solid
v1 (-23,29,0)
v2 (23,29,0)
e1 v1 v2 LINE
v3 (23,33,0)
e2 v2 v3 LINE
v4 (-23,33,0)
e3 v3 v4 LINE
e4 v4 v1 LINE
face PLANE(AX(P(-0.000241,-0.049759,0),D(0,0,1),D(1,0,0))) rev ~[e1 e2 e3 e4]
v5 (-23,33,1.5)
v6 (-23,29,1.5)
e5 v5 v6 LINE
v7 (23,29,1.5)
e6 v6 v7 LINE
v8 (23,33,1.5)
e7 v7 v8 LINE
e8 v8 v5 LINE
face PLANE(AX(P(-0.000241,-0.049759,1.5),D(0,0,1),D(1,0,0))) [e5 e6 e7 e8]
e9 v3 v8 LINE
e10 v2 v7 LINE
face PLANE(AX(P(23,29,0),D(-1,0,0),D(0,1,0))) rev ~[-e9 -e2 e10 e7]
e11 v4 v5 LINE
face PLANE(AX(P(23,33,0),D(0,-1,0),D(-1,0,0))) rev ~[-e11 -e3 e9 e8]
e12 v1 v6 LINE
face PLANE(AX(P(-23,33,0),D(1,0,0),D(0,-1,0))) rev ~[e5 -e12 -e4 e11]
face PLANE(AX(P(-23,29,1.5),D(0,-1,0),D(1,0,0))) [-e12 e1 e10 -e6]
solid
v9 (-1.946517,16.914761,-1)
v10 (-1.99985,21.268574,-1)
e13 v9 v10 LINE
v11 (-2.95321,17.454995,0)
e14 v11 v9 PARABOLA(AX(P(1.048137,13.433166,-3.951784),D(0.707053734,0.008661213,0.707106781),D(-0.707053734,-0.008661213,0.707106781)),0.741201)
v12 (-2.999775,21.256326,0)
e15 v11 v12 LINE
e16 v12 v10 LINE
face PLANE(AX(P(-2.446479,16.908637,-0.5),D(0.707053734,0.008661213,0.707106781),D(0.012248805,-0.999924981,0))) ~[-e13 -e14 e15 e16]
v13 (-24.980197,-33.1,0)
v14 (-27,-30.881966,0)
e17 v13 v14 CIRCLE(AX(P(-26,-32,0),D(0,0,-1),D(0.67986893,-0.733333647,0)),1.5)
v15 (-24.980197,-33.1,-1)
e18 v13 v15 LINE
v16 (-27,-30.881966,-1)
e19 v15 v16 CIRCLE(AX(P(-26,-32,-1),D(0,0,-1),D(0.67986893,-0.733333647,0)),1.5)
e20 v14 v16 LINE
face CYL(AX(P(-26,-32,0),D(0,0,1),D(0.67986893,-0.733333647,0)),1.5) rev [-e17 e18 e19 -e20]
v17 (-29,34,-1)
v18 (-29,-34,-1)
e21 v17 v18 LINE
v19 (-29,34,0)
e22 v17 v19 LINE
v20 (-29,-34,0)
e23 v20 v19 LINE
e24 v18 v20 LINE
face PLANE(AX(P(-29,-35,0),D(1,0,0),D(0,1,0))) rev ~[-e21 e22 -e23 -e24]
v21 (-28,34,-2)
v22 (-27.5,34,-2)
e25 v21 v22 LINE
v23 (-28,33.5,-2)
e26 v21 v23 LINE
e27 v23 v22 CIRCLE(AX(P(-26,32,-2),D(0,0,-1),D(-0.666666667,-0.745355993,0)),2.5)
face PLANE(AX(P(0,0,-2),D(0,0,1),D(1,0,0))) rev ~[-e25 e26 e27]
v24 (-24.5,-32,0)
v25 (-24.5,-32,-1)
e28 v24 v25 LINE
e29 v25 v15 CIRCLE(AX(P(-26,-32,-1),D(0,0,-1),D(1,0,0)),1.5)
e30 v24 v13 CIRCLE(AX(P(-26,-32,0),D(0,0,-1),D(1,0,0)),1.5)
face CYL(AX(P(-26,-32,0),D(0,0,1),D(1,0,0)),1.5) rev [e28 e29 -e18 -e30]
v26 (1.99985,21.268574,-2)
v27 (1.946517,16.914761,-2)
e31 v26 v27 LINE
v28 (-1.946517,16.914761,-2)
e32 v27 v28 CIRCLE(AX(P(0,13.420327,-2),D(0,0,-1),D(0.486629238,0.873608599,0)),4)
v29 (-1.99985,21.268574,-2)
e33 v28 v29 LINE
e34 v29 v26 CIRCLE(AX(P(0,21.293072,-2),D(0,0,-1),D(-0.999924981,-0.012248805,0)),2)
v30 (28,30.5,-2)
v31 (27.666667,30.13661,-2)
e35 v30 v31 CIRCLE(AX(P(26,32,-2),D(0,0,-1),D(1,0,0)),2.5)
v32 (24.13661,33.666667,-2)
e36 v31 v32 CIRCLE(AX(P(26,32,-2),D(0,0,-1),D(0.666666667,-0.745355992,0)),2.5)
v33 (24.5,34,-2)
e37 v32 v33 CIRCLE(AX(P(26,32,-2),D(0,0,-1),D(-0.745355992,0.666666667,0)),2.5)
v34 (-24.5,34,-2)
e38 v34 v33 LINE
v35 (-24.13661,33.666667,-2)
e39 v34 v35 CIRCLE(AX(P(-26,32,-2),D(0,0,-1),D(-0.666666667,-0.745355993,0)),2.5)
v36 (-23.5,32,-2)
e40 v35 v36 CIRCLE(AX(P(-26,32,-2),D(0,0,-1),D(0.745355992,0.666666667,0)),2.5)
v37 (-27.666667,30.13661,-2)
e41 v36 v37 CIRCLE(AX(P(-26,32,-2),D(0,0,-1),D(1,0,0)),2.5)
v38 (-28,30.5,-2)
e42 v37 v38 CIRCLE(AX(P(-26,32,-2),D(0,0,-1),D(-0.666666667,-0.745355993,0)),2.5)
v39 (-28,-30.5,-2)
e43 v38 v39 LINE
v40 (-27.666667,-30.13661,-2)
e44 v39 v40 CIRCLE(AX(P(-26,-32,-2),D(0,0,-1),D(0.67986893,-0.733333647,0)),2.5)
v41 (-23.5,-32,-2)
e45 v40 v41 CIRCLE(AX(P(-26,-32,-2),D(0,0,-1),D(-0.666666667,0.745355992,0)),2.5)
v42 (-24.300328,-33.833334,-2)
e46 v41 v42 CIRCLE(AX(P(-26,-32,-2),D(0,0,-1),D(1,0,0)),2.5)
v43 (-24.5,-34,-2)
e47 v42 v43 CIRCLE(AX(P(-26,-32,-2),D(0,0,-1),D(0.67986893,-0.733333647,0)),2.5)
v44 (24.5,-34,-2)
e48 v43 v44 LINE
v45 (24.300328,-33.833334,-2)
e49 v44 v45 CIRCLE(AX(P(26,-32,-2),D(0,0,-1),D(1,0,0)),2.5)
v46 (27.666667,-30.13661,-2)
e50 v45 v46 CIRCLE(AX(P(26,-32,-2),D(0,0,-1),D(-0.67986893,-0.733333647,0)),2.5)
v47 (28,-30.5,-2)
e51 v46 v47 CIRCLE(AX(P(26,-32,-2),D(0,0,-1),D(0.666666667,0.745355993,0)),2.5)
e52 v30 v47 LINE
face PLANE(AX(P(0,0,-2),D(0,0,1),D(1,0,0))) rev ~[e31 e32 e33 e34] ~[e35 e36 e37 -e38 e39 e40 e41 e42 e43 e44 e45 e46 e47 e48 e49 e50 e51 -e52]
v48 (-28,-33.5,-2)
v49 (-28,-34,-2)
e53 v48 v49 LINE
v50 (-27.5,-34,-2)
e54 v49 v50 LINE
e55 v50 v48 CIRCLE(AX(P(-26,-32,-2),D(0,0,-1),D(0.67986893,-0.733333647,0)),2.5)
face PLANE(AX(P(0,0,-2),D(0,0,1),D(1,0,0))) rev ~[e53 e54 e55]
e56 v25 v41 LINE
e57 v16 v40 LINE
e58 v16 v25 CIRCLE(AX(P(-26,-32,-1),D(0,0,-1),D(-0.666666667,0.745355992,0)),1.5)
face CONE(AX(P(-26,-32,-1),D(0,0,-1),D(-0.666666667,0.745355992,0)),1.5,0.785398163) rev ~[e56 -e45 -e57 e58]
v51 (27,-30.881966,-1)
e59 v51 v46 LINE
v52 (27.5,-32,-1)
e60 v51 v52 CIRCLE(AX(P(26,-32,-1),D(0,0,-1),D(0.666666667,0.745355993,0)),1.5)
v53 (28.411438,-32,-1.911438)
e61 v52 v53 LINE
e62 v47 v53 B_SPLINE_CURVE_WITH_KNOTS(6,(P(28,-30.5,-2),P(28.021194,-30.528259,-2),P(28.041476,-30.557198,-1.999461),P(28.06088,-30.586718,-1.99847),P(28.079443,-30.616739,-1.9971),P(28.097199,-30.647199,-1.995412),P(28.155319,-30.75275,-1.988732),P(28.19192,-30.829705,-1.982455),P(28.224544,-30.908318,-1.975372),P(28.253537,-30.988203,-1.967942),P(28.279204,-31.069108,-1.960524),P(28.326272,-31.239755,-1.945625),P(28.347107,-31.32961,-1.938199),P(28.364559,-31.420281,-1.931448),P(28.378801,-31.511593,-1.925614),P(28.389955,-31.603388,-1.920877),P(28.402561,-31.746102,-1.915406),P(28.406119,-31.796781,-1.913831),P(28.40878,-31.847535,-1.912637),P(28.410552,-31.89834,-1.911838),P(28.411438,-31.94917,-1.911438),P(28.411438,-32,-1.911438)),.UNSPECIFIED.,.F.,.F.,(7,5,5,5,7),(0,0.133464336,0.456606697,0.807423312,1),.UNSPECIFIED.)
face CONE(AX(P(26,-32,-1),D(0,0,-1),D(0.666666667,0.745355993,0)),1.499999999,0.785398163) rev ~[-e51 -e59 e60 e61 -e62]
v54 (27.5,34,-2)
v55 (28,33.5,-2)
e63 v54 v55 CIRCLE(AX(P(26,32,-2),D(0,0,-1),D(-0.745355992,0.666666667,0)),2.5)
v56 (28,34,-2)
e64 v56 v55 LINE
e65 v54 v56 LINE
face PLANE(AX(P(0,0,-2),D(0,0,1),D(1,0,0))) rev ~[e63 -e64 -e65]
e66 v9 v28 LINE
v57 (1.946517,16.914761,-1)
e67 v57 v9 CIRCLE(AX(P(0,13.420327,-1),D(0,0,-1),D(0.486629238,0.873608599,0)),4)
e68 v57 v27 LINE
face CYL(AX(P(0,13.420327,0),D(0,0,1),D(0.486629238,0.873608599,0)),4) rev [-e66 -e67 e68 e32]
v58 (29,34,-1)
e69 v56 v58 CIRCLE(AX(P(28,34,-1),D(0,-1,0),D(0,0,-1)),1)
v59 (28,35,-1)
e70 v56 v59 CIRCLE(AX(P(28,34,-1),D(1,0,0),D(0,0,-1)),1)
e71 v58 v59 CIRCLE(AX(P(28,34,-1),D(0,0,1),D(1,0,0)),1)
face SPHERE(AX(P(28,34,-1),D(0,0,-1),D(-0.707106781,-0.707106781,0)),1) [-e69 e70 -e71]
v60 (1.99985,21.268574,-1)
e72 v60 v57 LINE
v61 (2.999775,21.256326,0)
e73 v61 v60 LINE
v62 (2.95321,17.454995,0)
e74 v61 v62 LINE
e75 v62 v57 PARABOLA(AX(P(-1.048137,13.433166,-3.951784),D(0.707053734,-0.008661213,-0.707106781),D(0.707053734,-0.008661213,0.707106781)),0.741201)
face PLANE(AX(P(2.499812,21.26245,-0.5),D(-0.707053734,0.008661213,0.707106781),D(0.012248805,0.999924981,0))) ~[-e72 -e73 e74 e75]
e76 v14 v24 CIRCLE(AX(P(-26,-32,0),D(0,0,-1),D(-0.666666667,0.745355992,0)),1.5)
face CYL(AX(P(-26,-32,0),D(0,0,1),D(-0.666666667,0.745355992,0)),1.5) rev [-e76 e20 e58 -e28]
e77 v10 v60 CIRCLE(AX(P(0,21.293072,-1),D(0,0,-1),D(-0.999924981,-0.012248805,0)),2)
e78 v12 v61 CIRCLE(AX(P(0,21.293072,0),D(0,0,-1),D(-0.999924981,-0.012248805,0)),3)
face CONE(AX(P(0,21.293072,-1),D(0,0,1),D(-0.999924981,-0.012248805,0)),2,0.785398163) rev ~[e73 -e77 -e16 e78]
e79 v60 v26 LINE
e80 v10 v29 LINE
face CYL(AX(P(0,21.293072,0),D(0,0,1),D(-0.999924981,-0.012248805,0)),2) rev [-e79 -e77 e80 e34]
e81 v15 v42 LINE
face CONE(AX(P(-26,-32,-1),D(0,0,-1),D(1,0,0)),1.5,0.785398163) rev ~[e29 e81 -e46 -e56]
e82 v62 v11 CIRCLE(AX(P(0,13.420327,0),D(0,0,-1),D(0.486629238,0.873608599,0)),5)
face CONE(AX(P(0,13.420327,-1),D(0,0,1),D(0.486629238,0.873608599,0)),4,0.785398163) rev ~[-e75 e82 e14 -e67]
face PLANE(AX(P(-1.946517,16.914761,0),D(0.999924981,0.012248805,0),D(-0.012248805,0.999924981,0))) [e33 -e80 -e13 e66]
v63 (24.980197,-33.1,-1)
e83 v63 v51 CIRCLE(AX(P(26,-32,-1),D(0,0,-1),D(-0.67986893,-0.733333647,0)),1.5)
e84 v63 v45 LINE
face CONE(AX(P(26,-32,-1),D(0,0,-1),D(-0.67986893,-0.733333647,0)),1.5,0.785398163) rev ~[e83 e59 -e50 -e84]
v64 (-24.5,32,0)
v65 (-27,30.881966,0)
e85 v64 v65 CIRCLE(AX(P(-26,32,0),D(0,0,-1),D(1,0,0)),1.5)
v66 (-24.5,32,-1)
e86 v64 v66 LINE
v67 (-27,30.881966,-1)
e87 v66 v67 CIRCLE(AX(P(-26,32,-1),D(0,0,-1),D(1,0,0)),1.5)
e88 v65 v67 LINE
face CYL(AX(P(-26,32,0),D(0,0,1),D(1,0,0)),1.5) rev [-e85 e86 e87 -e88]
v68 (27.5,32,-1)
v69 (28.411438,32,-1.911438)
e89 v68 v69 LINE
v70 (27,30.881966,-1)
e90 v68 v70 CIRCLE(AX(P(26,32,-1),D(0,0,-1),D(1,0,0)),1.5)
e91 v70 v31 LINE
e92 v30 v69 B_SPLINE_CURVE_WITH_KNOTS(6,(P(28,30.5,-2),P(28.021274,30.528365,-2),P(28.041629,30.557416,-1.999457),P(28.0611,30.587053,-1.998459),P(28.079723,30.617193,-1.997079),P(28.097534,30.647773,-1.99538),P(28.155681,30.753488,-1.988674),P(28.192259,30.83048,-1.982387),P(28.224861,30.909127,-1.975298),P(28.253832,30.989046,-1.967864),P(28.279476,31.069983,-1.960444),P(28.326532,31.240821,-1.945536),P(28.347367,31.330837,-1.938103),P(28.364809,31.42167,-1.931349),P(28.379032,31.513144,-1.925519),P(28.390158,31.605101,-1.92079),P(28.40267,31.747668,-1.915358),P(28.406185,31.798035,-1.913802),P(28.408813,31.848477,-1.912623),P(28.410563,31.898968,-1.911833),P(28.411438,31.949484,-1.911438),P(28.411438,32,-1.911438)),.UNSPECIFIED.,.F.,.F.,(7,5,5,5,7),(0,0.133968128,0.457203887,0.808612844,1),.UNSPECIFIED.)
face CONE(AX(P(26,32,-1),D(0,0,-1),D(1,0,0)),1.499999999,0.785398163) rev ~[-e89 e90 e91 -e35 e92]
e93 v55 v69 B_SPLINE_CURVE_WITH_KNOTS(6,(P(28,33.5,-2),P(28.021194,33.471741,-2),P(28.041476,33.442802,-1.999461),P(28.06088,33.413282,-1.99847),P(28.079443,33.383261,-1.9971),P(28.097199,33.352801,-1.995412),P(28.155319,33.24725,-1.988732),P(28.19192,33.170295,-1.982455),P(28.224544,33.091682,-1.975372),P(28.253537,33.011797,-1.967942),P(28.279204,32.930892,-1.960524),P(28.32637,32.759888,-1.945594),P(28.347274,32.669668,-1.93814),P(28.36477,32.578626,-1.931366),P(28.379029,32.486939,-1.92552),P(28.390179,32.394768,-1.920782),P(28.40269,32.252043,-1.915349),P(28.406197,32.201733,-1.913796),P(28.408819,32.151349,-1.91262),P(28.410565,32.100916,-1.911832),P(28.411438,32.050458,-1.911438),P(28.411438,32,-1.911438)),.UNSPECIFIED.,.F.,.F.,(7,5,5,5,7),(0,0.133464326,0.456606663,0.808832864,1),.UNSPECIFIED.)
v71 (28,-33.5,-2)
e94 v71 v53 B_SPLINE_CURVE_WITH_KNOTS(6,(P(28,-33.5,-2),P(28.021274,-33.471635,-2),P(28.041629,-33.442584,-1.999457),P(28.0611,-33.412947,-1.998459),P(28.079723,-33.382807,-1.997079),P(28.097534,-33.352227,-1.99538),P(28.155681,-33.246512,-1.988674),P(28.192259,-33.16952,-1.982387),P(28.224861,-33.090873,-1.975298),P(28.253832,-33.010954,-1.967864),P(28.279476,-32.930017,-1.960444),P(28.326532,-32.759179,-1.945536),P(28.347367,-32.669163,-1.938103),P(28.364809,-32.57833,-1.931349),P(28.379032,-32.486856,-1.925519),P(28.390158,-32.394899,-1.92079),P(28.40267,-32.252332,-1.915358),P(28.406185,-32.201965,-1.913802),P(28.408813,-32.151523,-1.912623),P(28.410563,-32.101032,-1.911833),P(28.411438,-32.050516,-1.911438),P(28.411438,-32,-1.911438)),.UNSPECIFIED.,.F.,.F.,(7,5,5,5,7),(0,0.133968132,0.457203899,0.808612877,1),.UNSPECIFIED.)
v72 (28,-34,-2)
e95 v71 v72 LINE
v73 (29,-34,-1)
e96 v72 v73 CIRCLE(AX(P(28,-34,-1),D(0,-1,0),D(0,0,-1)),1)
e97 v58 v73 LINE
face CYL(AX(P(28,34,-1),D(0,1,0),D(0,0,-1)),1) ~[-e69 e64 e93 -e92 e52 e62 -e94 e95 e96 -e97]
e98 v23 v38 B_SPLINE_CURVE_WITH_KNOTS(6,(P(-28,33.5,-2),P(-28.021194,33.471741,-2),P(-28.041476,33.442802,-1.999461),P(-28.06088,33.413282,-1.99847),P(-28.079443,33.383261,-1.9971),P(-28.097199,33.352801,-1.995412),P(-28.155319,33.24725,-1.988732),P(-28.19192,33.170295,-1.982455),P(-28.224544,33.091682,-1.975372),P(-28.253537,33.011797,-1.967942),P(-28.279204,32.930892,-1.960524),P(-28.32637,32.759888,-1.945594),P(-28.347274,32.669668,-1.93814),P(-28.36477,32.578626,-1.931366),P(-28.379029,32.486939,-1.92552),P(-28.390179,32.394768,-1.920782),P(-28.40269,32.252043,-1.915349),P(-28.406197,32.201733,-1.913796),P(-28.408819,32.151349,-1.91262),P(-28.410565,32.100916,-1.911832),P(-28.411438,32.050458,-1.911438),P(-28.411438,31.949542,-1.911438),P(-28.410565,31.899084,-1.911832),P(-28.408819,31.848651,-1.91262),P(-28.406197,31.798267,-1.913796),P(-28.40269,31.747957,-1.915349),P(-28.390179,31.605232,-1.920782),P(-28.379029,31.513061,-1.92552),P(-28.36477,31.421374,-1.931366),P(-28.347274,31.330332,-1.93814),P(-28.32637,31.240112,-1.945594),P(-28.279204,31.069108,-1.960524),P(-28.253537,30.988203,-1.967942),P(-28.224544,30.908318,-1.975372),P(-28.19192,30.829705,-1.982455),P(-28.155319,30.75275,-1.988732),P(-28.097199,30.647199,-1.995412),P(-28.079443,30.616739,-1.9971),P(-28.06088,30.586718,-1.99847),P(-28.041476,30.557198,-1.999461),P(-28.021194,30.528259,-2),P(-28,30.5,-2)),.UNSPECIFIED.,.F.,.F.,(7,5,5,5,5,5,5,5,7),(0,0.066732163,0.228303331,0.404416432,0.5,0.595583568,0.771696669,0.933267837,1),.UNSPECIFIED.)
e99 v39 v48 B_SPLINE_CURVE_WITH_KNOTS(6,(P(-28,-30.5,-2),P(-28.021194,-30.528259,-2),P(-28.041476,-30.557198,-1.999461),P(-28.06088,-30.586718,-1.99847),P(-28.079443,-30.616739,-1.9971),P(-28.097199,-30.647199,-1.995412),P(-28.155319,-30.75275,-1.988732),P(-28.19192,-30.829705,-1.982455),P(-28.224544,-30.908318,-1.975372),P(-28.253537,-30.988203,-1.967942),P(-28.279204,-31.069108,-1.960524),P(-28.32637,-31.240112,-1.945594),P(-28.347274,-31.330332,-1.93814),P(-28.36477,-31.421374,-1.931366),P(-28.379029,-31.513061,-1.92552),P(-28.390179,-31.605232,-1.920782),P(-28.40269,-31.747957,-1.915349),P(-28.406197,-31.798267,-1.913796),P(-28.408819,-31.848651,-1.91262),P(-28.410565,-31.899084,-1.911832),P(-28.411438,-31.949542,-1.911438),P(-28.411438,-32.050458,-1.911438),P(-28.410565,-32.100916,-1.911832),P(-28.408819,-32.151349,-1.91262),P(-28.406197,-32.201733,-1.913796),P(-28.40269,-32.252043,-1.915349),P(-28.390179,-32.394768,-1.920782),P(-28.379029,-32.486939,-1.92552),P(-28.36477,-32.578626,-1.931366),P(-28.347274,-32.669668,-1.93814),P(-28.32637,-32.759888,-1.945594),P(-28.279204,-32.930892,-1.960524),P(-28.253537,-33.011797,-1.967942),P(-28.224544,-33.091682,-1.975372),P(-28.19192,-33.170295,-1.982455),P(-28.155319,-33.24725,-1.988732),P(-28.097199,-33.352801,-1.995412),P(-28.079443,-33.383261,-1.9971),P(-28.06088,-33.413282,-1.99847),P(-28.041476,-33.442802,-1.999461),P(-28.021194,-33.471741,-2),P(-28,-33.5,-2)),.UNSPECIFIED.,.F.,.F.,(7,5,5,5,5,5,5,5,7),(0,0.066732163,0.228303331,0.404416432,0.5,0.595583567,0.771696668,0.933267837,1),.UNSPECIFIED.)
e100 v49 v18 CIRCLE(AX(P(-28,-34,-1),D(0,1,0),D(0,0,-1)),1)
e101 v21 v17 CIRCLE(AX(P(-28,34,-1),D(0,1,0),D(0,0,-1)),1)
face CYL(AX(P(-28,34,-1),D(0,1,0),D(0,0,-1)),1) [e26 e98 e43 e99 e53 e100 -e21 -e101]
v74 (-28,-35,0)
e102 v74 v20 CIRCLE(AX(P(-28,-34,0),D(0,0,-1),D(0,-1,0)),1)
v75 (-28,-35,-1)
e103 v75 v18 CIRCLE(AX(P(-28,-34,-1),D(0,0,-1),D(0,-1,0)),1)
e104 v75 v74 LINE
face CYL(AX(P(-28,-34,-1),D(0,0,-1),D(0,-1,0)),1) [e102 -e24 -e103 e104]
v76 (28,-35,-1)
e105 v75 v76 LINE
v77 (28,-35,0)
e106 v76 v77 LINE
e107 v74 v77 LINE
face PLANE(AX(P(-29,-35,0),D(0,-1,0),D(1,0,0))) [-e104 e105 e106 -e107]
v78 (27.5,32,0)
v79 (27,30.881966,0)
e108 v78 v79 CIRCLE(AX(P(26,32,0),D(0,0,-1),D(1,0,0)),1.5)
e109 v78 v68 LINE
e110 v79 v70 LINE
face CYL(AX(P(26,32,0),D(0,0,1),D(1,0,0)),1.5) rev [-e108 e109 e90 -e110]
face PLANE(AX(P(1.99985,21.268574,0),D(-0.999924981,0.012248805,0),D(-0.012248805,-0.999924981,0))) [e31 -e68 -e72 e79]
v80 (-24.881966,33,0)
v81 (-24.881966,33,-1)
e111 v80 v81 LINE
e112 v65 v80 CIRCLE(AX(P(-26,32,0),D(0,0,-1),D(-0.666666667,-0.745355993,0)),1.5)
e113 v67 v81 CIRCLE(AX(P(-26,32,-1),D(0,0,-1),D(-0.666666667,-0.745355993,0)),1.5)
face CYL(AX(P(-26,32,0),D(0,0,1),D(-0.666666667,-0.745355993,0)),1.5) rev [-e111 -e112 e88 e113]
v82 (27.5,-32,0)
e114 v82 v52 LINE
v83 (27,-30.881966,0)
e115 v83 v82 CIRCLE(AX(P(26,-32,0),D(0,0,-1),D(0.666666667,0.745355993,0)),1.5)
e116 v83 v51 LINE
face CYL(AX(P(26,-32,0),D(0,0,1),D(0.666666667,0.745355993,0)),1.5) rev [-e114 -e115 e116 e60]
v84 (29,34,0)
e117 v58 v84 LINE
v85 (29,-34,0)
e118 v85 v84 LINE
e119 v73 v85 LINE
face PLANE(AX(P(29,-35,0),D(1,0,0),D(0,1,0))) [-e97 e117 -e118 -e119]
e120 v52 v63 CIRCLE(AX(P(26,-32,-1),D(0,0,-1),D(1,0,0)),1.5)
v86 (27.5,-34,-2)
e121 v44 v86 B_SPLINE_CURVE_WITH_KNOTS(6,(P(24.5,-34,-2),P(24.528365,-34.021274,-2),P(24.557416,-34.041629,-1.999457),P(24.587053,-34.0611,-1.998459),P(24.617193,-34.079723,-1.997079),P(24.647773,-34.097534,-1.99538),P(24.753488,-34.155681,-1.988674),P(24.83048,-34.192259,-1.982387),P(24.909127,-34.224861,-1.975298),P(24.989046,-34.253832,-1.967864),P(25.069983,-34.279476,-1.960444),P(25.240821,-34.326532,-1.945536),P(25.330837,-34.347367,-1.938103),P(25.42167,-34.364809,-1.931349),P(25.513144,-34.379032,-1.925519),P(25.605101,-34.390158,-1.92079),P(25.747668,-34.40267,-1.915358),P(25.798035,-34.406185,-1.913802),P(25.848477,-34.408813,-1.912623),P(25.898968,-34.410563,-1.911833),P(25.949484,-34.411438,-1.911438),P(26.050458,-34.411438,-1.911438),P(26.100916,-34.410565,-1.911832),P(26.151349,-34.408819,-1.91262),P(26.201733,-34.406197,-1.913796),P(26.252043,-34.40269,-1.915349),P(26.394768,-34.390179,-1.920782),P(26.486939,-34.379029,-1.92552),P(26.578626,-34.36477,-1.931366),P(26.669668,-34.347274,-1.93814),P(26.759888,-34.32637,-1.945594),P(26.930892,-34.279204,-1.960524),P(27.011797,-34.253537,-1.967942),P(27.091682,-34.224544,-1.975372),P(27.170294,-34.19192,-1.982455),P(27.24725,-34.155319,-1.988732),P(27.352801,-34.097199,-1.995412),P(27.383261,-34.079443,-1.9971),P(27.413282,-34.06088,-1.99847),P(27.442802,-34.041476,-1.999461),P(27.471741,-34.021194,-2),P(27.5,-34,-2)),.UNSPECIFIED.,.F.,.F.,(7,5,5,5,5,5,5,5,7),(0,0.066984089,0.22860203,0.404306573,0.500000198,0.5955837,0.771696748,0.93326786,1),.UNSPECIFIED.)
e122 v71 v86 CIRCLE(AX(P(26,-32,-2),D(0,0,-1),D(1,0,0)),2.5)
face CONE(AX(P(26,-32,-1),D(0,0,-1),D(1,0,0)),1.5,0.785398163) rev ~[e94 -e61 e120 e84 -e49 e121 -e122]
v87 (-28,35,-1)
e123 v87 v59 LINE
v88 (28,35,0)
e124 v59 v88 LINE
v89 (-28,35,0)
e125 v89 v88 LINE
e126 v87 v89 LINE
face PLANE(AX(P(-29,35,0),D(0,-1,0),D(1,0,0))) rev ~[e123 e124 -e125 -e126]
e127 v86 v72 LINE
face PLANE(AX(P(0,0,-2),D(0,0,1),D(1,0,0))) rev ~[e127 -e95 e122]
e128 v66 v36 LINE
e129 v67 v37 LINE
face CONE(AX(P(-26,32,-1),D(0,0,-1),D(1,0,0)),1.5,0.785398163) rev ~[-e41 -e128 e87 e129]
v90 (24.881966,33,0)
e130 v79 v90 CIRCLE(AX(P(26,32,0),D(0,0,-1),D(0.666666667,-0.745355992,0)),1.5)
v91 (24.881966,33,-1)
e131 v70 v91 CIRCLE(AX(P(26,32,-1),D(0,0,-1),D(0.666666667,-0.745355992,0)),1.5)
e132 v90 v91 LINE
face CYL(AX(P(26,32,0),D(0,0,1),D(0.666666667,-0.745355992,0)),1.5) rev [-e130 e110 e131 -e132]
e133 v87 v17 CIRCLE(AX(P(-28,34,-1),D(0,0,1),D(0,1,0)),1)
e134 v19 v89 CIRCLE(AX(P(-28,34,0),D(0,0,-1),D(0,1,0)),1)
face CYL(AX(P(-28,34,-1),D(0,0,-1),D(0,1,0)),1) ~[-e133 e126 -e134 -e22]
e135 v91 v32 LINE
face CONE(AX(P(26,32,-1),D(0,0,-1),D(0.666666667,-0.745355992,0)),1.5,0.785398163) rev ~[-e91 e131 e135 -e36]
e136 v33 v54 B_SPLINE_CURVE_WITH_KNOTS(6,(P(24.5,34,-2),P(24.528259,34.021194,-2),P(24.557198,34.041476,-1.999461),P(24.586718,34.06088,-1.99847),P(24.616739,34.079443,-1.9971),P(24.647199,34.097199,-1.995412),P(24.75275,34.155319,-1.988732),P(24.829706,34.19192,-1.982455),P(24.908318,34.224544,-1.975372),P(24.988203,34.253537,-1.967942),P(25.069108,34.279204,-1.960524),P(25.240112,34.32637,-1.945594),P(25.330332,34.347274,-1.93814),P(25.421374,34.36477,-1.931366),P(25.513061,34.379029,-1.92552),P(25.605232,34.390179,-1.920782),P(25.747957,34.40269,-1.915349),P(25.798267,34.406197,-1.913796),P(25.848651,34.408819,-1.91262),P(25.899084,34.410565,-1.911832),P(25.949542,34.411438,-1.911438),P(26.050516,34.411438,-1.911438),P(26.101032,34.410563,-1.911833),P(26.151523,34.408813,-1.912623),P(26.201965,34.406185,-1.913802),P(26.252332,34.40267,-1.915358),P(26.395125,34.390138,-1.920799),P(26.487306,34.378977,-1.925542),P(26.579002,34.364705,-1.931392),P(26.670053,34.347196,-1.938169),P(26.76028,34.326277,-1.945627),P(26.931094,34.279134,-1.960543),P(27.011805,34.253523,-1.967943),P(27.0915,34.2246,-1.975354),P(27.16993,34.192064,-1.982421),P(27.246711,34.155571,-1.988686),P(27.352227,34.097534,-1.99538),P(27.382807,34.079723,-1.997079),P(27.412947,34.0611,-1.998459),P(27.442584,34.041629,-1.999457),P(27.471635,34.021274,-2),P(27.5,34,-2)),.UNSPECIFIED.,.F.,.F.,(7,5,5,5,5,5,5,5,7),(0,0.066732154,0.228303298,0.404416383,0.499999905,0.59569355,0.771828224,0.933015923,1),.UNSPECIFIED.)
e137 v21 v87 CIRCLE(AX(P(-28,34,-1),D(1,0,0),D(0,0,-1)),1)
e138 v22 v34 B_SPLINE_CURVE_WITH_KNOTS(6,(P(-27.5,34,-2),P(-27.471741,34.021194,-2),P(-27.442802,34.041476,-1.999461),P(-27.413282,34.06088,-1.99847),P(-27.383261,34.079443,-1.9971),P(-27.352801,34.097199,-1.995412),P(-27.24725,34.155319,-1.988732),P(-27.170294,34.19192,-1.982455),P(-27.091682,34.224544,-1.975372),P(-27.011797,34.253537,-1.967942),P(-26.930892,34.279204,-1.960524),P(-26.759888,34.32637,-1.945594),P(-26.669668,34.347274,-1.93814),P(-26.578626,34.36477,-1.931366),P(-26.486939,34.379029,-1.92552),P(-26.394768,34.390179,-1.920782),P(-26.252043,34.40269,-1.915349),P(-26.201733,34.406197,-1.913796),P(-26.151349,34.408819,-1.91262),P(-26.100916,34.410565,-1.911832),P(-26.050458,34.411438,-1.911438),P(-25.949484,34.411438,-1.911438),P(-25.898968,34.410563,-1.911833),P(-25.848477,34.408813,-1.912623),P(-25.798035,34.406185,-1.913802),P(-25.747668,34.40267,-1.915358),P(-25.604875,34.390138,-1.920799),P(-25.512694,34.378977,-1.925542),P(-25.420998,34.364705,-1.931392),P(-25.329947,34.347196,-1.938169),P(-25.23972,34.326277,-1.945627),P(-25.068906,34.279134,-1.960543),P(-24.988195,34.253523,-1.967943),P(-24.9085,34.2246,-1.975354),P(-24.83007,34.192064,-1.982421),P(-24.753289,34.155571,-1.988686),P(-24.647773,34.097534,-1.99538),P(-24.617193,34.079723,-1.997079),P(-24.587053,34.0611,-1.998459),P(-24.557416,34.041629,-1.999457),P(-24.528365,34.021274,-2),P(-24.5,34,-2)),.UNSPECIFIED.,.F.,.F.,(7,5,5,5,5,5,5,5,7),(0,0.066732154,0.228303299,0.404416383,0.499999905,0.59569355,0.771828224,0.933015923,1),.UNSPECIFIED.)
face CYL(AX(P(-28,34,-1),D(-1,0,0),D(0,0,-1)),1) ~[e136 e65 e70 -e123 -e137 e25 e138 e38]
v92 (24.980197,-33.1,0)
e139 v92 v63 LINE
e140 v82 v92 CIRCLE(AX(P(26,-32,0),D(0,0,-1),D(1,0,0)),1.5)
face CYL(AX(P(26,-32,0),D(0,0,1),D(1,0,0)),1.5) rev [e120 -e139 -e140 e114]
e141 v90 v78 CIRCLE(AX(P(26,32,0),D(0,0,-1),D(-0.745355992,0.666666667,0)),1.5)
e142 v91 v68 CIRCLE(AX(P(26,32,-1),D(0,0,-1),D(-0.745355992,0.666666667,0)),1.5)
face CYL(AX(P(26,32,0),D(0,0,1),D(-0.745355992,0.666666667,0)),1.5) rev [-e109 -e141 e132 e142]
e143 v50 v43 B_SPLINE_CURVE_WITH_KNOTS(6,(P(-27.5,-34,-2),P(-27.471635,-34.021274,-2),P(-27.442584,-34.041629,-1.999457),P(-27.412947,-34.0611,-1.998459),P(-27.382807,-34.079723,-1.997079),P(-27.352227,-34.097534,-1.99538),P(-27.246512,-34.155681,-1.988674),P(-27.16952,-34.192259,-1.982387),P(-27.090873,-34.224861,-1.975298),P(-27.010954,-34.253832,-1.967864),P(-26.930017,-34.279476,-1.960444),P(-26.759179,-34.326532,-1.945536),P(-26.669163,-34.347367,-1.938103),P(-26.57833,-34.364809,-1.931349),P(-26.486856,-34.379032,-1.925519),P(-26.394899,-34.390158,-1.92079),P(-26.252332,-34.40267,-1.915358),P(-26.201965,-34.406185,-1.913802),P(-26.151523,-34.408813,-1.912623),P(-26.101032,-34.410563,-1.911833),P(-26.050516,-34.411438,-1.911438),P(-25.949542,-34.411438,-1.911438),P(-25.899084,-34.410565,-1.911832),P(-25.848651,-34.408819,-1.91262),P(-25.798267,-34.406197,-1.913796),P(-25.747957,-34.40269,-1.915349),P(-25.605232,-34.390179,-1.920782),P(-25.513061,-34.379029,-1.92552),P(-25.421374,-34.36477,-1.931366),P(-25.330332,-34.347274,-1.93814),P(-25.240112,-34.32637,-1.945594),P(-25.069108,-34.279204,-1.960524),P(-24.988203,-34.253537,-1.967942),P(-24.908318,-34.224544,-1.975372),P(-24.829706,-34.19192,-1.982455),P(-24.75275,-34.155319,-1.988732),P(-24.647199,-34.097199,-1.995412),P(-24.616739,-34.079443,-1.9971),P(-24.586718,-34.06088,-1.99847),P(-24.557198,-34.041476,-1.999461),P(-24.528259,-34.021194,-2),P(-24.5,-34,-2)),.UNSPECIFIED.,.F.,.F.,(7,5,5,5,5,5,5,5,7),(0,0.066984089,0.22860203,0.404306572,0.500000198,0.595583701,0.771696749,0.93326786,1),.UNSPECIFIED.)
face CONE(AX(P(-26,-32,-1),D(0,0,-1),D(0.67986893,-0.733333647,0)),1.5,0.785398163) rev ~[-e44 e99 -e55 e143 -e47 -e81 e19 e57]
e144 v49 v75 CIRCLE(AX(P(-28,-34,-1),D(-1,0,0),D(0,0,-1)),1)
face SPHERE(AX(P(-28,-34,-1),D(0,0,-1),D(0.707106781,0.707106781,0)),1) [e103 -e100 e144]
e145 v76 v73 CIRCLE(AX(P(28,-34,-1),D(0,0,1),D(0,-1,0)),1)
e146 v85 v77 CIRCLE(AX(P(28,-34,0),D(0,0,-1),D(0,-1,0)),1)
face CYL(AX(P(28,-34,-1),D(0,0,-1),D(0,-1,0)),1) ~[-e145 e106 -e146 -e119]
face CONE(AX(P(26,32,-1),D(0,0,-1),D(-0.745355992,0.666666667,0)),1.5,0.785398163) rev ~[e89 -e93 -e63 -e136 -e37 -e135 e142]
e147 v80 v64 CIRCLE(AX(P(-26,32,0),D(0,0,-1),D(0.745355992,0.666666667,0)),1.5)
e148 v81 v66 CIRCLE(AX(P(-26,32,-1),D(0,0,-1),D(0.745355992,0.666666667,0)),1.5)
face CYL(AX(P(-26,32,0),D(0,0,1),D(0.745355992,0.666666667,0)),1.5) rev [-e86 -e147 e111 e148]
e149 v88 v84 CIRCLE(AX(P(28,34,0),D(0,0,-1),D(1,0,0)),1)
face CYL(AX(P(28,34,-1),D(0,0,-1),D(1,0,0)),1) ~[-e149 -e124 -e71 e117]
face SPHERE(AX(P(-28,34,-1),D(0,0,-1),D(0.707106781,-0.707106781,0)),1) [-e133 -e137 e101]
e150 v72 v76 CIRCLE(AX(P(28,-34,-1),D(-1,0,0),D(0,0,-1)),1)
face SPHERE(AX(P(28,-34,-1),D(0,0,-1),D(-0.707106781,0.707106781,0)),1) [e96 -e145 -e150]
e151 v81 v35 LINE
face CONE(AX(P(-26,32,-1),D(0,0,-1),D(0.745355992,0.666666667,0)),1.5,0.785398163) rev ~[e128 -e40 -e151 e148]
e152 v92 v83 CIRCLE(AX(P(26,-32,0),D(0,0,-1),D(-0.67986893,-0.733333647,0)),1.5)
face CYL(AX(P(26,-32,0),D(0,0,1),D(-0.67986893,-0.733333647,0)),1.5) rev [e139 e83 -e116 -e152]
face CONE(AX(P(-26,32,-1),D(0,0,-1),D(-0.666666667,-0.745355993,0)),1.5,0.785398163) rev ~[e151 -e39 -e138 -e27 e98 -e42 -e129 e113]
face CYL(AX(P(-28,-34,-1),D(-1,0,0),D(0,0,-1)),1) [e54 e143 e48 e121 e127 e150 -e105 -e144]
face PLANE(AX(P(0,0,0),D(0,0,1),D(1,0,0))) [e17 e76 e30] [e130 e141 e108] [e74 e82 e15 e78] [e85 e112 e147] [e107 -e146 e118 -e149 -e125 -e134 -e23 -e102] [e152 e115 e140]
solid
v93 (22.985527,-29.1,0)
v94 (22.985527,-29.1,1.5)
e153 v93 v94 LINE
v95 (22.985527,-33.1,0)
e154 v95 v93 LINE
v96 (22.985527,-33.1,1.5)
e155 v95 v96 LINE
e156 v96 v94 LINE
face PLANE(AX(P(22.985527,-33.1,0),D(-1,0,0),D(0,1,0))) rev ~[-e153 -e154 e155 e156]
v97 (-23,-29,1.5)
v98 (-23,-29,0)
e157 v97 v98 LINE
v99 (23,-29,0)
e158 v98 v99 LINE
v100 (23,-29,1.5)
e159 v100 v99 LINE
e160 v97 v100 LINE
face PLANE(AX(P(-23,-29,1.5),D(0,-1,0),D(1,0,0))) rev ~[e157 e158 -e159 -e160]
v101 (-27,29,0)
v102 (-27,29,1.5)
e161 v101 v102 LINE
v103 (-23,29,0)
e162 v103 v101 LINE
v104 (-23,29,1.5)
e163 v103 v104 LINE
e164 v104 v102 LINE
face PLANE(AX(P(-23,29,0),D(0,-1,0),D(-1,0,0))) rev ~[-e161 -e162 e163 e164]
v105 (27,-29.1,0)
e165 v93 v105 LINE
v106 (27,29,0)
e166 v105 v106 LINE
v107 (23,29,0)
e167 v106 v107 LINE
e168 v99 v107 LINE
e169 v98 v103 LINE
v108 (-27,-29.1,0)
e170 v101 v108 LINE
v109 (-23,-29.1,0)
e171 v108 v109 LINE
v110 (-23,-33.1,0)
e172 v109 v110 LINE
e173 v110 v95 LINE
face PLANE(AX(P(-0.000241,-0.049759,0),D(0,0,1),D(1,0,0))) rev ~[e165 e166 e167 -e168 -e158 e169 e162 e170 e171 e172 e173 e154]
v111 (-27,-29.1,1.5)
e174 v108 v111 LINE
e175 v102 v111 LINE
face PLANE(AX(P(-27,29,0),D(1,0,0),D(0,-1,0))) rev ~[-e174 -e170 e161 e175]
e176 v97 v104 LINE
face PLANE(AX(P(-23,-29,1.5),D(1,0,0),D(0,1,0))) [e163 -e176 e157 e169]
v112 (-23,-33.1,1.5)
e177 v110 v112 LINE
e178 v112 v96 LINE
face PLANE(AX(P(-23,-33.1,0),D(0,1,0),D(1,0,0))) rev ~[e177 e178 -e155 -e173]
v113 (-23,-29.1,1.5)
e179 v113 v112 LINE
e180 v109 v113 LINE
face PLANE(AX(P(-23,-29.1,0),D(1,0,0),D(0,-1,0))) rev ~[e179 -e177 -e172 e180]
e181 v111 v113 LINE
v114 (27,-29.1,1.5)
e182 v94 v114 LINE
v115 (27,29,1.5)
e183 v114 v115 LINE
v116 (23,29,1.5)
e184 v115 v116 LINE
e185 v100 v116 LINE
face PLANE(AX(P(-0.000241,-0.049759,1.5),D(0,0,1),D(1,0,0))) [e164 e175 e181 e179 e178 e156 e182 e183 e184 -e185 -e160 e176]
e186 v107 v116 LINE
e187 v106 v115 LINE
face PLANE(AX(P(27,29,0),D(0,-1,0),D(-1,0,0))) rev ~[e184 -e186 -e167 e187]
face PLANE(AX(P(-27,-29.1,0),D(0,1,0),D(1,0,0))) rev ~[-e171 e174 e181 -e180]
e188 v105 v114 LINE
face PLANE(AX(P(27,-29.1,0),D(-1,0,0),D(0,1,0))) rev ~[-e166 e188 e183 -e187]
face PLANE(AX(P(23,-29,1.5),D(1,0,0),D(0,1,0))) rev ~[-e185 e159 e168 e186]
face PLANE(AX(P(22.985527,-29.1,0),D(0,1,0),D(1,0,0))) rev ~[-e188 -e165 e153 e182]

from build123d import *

# Parameters (mm, degrees)
F0_W         = 58
F0_H         = 70
F1_DEPTH     = 2
F2_DEPTH     = 1.5
F3_SIZE      = 1
F4_T1_DEPTH  = 56
F4_T3_DEPTH  = 68
F4_T5_DEPTH  = 3.5
F4_S9_W      = 1
F4_S9_H      = 1
F4_T10_DEPTH = 1
F4_S15_W     = 1
F4_S15_H     = 1
F4_T16_DEPTH = 1
F4_S21_W     = 1
F4_S21_H     = 1
F4_T22_DEPTH = 1
F4_S27_W     = 1
F4_S27_H     = 1
F4_T28_DEPTH = 1
F5_W         = 46
F5_H         = 58
F6_DEPTH     = 1.5
F7_SIZE      = 1


# Not quite as in the source:
# - a fillet or chamfer that OpenCascade refuses, or shapes differently, is made with other operations: its cross-section is extruded or revolved along the edge and cut away or added


with BuildPart() as f1:
    # F0 (on Top) → F1 (new body)
    with BuildSketch(Plane.XY):
        Rectangle(F0_W, F0_H)
        with BuildLine():
            Line((24.9801966052, -33.1000004709), (22.9855267704, -33.1000004709))
            Line((22.9855267704, -33.1000004709), (-23, -33.1000004709))
            Line((-23, -33.1000004709), (-24.9801966052, -33.1000004709))
            ThreePointArc((-24.9801966052, -33.1000004709), (-27.1090614319, -33.009941949), (-27, -30.8819660113))
            Line((-27, -30.8819660113), (-27, -29.1000004709))
            Line((-27, -29.1000004709), (-27, 29))
            Line((-27, 29), (-27, 30.8819660113))
            ThreePointArc((-27, 30.8819660113), (-27.0606601718, 33.0606601718), (-24.8819660113, 33))
            Line((-24.8819660113, 33), (-23, 33))
            Line((-23, 33), (23, 33))
            Line((23, 33), (24.8819660113, 33))
            ThreePointArc((24.8819660113, 33), (26.5352331347, 33.4012585384), (27.5, 32))
            ThreePointArc((27.5, 32), (27.3693063938, 31.3876275643), (27, 30.8819660113))
            Line((27, 30.8819660113), (27, 29))
            Line((27, 29), (27, -29.1000004709))
            Line((27, -29.1000004709), (27, -30.8819660113))
            ThreePointArc((27, -30.8819660113), (27.3693063938, -31.3876275643), (27.5, -32))
            ThreePointArc((27.5, -32), (26.6001228657, -33.374719079), (24.9801966052, -33.1000004709))
        make_face(mode=Mode.SUBTRACT)
        with BuildLine():
            Line((-24.9801966052, -33.1000004709), (-23, -33.1000004709))
            Line((-23, -33.1000004709), (-23, -29.1000004709))
            Line((-23, -29.1000004709), (-27, -29.1000004709))
            Line((-27, -29.1000004709), (-27, -30.8819660113))
            ThreePointArc((-27, -30.8819660113), (-25.3876275643, -30.6306936062), (-24.5, -32))
            ThreePointArc((-24.5, -32), (-24.625280921, -32.6001228657), (-24.9801966052, -33.1000004709))
        make_face()
        Polygon((-23, -33.1000004709), (22.9855267704, -33.1000004709), (22.9855267704, -29.1000004709), (27, -29.1000004709), (27, 29), (23, 29), (23, 33), (-23, 33), (-23, 29), (-27, 29), (-27, -29.1000004709), (-23, -29.1000004709), align=None)
        with BuildLine():
            ThreePointArc((1.9465169508, 16.914761033), (0, 9.4203266352), (-1.9465169508, 16.914761033))
            Line((-1.9465169508, 16.914761033), (-1.9998499612, 21.2685744208))
            ThreePointArc((-1.9998499612, 21.2685744208), (0, 23.2930720299), (1.9998499612, 21.2685744208))
            Line((1.9998499612, 21.2685744208), (1.9465169508, 16.914761033))
        make_face(mode=Mode.SUBTRACT)
        with BuildLine():
            Line((22.9855267704, -29.1000004709), (22.9855267704, -33.1000004709))
            Line((22.9855267704, -33.1000004709), (24.9801966052, -33.1000004709))
            ThreePointArc((24.9801966052, -33.1000004709), (24.8909385681, -30.990058051), (27, -30.8819660113))
            Line((27, -30.8819660113), (27, -29.1000004709))
            Line((27, -29.1000004709), (22.9855267704, -29.1000004709))
        make_face()
        with BuildLine():
            Line((-27, 30.8819660113), (-27, 29))
            Line((-27, 29), (-23, 29))
            Line((-23, 29), (-23, 33))
            Line((-23, 33), (-24.8819660113, 33))
            ThreePointArc((-24.8819660113, 33), (-24.5987414616, 32.5352331347), (-24.5, 32))
            ThreePointArc((-24.5, 32), (-25.3876275643, 30.6306936062), (-27, 30.8819660113))
        make_face()
        with BuildLine():
            Line((23, 29), (27, 29))
            Line((27, 29), (27, 30.8819660113))
            ThreePointArc((27, 30.8819660113), (24.9393398282, 30.9393398282), (24.8819660113, 33))
            Line((24.8819660113, 33), (23, 33))
            Line((23, 33), (23, 29))
        make_face()
    extrude(amount=-F1_DEPTH)

    # F3
    f3_edges = [f1.edges().sort_by_distance(p)[0] for p in [
        (25, 33.118034, -2),
        (-27.118034, 31, -2),
        (27.019803, -30.9, -2),
        (-25, -33.118034, -2),
    ]]
    chamfer(f3_edges, length=F3_SIZE)

    # F4: fillet of radius 1 on 8 edges, made by hand

    # F4_s2 → F4_t1 (cut)
    with BuildSketch(Plane.YZ.offset(-28)):
        with BuildLine():
            ThreePointArc((-34, -2), (-34.7071067812, -1.7071067812), (-35, -1))
            Line((-35, -1), (-35, -2))
            Line((-35, -2), (-34, -2))
        make_face()
        with BuildLine():
            ThreePointArc((34, -2), (34.7071067812, -1.7071067812), (35, -1))
            Line((35, -1), (35, -2))
            Line((35, -2), (34, -2))
        make_face()
    extrude(amount=F4_T1_DEPTH, mode=Mode.SUBTRACT)

    # F4_s4 → F4_t3 (cut)
    with BuildSketch(Plane.XZ.offset(-34)):
        with BuildLine():
            ThreePointArc((-28, -2), (-28.7071067812, -1.7071067812), (-29, -1))
            Line((-29, -1), (-29, -2))
            Line((-29, -2), (-28, -2))
        make_face()
        with BuildLine():
            ThreePointArc((28, -2), (28.7071067812, -1.7071067812), (29, -1))
            Line((29, -1), (29, -2))
            Line((29, -2), (28, -2))
        make_face()
    extrude(amount=F4_T3_DEPTH, mode=Mode.SUBTRACT)

    # F4_s6 → F4_t5 (cut)
    with BuildSketch(Plane.XY.offset(-1)):
        with BuildLine():
            ThreePointArc((-28, 35), (-28.7071067812, 34.7071067812), (-29, 34))
            Line((-29, 34), (-29, 35))
            Line((-29, 35), (-28, 35))
        make_face()
        with BuildLine():
            ThreePointArc((29, 34), (28.7071067812, 34.7071067812), (28, 35))
            Line((28, 35), (29, 35))
            Line((29, 35), (29, 34))
        make_face()
        with BuildLine():
            ThreePointArc((28, -35), (28.7071067812, -34.7071067812), (29, -34))
            Line((29, -34), (29, -35))
            Line((29, -35), (28, -35))
        make_face()
        with BuildLine():
            ThreePointArc((-28, -35), (-28.7071067812, -34.7071067812), (-29, -34))
            Line((-29, -34), (-29, -35))
            Line((-29, -35), (-28, -35))
        make_face()
    extrude(amount=F4_T5_DEPTH, mode=Mode.SUBTRACT)


with BuildPart() as f2:
    # F0 (on Top) → F2 (new body)
    with BuildSketch(Plane.XY):
        Polygon((-23, -33.1000004709), (22.9855267704, -33.1000004709), (22.9855267704, -29.1000004709), (27, -29.1000004709), (27, 29), (23, 29), (23, 33), (-23, 33), (-23, 29), (-27, 29), (-27, -29.1000004709), (-23, -29.1000004709), align=None)
        with BuildLine():
            ThreePointArc((1.9465169508, 16.914761033), (0, 9.4203266352), (-1.9465169508, 16.914761033))
            Line((-1.9465169508, 16.914761033), (-1.9998499612, 21.2685744208))
            ThreePointArc((-1.9998499612, 21.2685744208), (0, 23.2930720299), (1.9998499612, 21.2685744208))
            Line((1.9998499612, 21.2685744208), (1.9465169508, 16.914761033))
        make_face(mode=Mode.SUBTRACT)
    extrude(amount=F2_DEPTH)

    # F5 (on face) → F6 (cut)
    with BuildSketch(Plane.XY.offset(1.5)):
        Rectangle(F5_W, F5_H)
        with BuildLine():
            Line((1.9998499612, 21.2685744208), (1.9465169508, 16.914761033))
            ThreePointArc((1.9465169508, 16.914761033), (0, 9.4203266352), (-1.9465169508, 16.914761033))
            Line((-1.9465169508, 16.914761033), (-1.9998499612, 21.2685744208))
            ThreePointArc((-1.9998499612, 21.2685744208), (0, 23.2930720299), (1.9998499612, 21.2685744208))
        make_face(mode=Mode.SUBTRACT)
    extrude(amount=-F6_DEPTH, mode=Mode.SUBTRACT)


with BuildPart() as f4_tool8:
    # F4_s9 → F4_t10 (new body)
    with BuildSketch(Plane.XY.offset(-1)):
        with Locations((-28.5, -34.5)):
            Rectangle(F4_S9_W, F4_S9_H)
    extrude(amount=-F4_T10_DEPTH)

    # F4_s11 → F4_t12 (revolve, cut)
    with BuildSketch(Plane(origin=(-28, -34, -1), x_dir=(0.7071067812, 0.7071067812, 0), z_dir=(-0.7071067812, 0.7071067812, 0))):
        with BuildLine():
            ThreePointArc((0, -1), (1, 0), (0, 1))
            Line((0, 1), (0, -1))
        make_face()
    revolve(axis=Axis((-28, -34, -1), (0, 0, -1)), mode=Mode.SUBTRACT)


with BuildPart() as f1_1:
    add(f1.part)

    # F4_t7: cut F4_tool8
    add(f4_tool8.part, mode=Mode.SUBTRACT)


with BuildPart() as f4_tool14:
    # F4_s15 → F4_t16 (new body)
    with BuildSketch(Plane.XY.offset(-1)):
        with Locations((28.5, -34.5)):
            Rectangle(F4_S15_W, F4_S15_H)
    extrude(amount=-F4_T16_DEPTH)

    # F4_s17 → F4_t18 (revolve, cut)
    with BuildSketch(Plane(origin=(28, -34, -1), x_dir=(-0.7071067812, 0.7071067812, 0), z_dir=(-0.7071067812, -0.7071067812, 0))):
        with BuildLine():
            ThreePointArc((0, -1), (1, 0), (0, 1))
            Line((0, 1), (0, -1))
        make_face()
    revolve(axis=Axis((28, -34, -1), (0, 0, -1)), mode=Mode.SUBTRACT)


with BuildPart() as f1_2:
    add(f1_1.part)

    # F4_t13: cut F4_tool14
    add(f4_tool14.part, mode=Mode.SUBTRACT)


with BuildPart() as f4_tool20:
    # F4_s21 → F4_t22 (new body)
    with BuildSketch(Plane.XY.offset(-1)):
        with Locations((-28.5, 34.5)):
            Rectangle(F4_S21_W, F4_S21_H)
    extrude(amount=-F4_T22_DEPTH)

    # F4_s23 → F4_t24 (revolve, cut)
    with BuildSketch(Plane(origin=(-28, 34, -1), x_dir=(0.7071067812, -0.7071067812, 0), z_dir=(0.7071067812, 0.7071067812, 0))):
        with BuildLine():
            ThreePointArc((0, -1), (1, 0), (0, 1))
            Line((0, 1), (0, -1))
        make_face()
    revolve(axis=Axis((-28, 34, -1), (0, 0, -1)), mode=Mode.SUBTRACT)


with BuildPart() as f1_3:
    add(f1_2.part)

    # F4_t19: cut F4_tool20
    add(f4_tool20.part, mode=Mode.SUBTRACT)


with BuildPart() as f4_tool26:
    # F4_s27 → F4_t28 (new body)
    with BuildSketch(Plane.XY.offset(-1)):
        with Locations((28.5, 34.5)):
            Rectangle(F4_S27_W, F4_S27_H)
    extrude(amount=-F4_T28_DEPTH)

    # F4_s29 → F4_t30 (revolve, cut)
    with BuildSketch(Plane(origin=(28, 34, -1), x_dir=(-0.7071067812, -0.7071067812, 0), z_dir=(0.7071067812, -0.7071067812, 0))):
        with BuildLine():
            ThreePointArc((0, -1), (1, 0), (0, 1))
            Line((0, 1), (0, -1))
        make_face()
    revolve(axis=Axis((28, 34, -1), (0, 0, -1)), mode=Mode.SUBTRACT)


with BuildPart() as f1_4:
    add(f1_3.part)

    # F4_t25: cut F4_tool26
    add(f4_tool26.part, mode=Mode.SUBTRACT)

    # F7
    f7_edges = [f1_4.edges().sort_by_distance(p)[0] for p in [
        (0, 23.293072, 0),
        (-1.973183, 19.091668, 0),
        (0, 9.420327, 0),
        (1.973183, 19.091668, 0),
    ]]
    chamfer(f7_edges, length=F7_SIZE)


solid = Compound([f2.part, f1_4.part])
